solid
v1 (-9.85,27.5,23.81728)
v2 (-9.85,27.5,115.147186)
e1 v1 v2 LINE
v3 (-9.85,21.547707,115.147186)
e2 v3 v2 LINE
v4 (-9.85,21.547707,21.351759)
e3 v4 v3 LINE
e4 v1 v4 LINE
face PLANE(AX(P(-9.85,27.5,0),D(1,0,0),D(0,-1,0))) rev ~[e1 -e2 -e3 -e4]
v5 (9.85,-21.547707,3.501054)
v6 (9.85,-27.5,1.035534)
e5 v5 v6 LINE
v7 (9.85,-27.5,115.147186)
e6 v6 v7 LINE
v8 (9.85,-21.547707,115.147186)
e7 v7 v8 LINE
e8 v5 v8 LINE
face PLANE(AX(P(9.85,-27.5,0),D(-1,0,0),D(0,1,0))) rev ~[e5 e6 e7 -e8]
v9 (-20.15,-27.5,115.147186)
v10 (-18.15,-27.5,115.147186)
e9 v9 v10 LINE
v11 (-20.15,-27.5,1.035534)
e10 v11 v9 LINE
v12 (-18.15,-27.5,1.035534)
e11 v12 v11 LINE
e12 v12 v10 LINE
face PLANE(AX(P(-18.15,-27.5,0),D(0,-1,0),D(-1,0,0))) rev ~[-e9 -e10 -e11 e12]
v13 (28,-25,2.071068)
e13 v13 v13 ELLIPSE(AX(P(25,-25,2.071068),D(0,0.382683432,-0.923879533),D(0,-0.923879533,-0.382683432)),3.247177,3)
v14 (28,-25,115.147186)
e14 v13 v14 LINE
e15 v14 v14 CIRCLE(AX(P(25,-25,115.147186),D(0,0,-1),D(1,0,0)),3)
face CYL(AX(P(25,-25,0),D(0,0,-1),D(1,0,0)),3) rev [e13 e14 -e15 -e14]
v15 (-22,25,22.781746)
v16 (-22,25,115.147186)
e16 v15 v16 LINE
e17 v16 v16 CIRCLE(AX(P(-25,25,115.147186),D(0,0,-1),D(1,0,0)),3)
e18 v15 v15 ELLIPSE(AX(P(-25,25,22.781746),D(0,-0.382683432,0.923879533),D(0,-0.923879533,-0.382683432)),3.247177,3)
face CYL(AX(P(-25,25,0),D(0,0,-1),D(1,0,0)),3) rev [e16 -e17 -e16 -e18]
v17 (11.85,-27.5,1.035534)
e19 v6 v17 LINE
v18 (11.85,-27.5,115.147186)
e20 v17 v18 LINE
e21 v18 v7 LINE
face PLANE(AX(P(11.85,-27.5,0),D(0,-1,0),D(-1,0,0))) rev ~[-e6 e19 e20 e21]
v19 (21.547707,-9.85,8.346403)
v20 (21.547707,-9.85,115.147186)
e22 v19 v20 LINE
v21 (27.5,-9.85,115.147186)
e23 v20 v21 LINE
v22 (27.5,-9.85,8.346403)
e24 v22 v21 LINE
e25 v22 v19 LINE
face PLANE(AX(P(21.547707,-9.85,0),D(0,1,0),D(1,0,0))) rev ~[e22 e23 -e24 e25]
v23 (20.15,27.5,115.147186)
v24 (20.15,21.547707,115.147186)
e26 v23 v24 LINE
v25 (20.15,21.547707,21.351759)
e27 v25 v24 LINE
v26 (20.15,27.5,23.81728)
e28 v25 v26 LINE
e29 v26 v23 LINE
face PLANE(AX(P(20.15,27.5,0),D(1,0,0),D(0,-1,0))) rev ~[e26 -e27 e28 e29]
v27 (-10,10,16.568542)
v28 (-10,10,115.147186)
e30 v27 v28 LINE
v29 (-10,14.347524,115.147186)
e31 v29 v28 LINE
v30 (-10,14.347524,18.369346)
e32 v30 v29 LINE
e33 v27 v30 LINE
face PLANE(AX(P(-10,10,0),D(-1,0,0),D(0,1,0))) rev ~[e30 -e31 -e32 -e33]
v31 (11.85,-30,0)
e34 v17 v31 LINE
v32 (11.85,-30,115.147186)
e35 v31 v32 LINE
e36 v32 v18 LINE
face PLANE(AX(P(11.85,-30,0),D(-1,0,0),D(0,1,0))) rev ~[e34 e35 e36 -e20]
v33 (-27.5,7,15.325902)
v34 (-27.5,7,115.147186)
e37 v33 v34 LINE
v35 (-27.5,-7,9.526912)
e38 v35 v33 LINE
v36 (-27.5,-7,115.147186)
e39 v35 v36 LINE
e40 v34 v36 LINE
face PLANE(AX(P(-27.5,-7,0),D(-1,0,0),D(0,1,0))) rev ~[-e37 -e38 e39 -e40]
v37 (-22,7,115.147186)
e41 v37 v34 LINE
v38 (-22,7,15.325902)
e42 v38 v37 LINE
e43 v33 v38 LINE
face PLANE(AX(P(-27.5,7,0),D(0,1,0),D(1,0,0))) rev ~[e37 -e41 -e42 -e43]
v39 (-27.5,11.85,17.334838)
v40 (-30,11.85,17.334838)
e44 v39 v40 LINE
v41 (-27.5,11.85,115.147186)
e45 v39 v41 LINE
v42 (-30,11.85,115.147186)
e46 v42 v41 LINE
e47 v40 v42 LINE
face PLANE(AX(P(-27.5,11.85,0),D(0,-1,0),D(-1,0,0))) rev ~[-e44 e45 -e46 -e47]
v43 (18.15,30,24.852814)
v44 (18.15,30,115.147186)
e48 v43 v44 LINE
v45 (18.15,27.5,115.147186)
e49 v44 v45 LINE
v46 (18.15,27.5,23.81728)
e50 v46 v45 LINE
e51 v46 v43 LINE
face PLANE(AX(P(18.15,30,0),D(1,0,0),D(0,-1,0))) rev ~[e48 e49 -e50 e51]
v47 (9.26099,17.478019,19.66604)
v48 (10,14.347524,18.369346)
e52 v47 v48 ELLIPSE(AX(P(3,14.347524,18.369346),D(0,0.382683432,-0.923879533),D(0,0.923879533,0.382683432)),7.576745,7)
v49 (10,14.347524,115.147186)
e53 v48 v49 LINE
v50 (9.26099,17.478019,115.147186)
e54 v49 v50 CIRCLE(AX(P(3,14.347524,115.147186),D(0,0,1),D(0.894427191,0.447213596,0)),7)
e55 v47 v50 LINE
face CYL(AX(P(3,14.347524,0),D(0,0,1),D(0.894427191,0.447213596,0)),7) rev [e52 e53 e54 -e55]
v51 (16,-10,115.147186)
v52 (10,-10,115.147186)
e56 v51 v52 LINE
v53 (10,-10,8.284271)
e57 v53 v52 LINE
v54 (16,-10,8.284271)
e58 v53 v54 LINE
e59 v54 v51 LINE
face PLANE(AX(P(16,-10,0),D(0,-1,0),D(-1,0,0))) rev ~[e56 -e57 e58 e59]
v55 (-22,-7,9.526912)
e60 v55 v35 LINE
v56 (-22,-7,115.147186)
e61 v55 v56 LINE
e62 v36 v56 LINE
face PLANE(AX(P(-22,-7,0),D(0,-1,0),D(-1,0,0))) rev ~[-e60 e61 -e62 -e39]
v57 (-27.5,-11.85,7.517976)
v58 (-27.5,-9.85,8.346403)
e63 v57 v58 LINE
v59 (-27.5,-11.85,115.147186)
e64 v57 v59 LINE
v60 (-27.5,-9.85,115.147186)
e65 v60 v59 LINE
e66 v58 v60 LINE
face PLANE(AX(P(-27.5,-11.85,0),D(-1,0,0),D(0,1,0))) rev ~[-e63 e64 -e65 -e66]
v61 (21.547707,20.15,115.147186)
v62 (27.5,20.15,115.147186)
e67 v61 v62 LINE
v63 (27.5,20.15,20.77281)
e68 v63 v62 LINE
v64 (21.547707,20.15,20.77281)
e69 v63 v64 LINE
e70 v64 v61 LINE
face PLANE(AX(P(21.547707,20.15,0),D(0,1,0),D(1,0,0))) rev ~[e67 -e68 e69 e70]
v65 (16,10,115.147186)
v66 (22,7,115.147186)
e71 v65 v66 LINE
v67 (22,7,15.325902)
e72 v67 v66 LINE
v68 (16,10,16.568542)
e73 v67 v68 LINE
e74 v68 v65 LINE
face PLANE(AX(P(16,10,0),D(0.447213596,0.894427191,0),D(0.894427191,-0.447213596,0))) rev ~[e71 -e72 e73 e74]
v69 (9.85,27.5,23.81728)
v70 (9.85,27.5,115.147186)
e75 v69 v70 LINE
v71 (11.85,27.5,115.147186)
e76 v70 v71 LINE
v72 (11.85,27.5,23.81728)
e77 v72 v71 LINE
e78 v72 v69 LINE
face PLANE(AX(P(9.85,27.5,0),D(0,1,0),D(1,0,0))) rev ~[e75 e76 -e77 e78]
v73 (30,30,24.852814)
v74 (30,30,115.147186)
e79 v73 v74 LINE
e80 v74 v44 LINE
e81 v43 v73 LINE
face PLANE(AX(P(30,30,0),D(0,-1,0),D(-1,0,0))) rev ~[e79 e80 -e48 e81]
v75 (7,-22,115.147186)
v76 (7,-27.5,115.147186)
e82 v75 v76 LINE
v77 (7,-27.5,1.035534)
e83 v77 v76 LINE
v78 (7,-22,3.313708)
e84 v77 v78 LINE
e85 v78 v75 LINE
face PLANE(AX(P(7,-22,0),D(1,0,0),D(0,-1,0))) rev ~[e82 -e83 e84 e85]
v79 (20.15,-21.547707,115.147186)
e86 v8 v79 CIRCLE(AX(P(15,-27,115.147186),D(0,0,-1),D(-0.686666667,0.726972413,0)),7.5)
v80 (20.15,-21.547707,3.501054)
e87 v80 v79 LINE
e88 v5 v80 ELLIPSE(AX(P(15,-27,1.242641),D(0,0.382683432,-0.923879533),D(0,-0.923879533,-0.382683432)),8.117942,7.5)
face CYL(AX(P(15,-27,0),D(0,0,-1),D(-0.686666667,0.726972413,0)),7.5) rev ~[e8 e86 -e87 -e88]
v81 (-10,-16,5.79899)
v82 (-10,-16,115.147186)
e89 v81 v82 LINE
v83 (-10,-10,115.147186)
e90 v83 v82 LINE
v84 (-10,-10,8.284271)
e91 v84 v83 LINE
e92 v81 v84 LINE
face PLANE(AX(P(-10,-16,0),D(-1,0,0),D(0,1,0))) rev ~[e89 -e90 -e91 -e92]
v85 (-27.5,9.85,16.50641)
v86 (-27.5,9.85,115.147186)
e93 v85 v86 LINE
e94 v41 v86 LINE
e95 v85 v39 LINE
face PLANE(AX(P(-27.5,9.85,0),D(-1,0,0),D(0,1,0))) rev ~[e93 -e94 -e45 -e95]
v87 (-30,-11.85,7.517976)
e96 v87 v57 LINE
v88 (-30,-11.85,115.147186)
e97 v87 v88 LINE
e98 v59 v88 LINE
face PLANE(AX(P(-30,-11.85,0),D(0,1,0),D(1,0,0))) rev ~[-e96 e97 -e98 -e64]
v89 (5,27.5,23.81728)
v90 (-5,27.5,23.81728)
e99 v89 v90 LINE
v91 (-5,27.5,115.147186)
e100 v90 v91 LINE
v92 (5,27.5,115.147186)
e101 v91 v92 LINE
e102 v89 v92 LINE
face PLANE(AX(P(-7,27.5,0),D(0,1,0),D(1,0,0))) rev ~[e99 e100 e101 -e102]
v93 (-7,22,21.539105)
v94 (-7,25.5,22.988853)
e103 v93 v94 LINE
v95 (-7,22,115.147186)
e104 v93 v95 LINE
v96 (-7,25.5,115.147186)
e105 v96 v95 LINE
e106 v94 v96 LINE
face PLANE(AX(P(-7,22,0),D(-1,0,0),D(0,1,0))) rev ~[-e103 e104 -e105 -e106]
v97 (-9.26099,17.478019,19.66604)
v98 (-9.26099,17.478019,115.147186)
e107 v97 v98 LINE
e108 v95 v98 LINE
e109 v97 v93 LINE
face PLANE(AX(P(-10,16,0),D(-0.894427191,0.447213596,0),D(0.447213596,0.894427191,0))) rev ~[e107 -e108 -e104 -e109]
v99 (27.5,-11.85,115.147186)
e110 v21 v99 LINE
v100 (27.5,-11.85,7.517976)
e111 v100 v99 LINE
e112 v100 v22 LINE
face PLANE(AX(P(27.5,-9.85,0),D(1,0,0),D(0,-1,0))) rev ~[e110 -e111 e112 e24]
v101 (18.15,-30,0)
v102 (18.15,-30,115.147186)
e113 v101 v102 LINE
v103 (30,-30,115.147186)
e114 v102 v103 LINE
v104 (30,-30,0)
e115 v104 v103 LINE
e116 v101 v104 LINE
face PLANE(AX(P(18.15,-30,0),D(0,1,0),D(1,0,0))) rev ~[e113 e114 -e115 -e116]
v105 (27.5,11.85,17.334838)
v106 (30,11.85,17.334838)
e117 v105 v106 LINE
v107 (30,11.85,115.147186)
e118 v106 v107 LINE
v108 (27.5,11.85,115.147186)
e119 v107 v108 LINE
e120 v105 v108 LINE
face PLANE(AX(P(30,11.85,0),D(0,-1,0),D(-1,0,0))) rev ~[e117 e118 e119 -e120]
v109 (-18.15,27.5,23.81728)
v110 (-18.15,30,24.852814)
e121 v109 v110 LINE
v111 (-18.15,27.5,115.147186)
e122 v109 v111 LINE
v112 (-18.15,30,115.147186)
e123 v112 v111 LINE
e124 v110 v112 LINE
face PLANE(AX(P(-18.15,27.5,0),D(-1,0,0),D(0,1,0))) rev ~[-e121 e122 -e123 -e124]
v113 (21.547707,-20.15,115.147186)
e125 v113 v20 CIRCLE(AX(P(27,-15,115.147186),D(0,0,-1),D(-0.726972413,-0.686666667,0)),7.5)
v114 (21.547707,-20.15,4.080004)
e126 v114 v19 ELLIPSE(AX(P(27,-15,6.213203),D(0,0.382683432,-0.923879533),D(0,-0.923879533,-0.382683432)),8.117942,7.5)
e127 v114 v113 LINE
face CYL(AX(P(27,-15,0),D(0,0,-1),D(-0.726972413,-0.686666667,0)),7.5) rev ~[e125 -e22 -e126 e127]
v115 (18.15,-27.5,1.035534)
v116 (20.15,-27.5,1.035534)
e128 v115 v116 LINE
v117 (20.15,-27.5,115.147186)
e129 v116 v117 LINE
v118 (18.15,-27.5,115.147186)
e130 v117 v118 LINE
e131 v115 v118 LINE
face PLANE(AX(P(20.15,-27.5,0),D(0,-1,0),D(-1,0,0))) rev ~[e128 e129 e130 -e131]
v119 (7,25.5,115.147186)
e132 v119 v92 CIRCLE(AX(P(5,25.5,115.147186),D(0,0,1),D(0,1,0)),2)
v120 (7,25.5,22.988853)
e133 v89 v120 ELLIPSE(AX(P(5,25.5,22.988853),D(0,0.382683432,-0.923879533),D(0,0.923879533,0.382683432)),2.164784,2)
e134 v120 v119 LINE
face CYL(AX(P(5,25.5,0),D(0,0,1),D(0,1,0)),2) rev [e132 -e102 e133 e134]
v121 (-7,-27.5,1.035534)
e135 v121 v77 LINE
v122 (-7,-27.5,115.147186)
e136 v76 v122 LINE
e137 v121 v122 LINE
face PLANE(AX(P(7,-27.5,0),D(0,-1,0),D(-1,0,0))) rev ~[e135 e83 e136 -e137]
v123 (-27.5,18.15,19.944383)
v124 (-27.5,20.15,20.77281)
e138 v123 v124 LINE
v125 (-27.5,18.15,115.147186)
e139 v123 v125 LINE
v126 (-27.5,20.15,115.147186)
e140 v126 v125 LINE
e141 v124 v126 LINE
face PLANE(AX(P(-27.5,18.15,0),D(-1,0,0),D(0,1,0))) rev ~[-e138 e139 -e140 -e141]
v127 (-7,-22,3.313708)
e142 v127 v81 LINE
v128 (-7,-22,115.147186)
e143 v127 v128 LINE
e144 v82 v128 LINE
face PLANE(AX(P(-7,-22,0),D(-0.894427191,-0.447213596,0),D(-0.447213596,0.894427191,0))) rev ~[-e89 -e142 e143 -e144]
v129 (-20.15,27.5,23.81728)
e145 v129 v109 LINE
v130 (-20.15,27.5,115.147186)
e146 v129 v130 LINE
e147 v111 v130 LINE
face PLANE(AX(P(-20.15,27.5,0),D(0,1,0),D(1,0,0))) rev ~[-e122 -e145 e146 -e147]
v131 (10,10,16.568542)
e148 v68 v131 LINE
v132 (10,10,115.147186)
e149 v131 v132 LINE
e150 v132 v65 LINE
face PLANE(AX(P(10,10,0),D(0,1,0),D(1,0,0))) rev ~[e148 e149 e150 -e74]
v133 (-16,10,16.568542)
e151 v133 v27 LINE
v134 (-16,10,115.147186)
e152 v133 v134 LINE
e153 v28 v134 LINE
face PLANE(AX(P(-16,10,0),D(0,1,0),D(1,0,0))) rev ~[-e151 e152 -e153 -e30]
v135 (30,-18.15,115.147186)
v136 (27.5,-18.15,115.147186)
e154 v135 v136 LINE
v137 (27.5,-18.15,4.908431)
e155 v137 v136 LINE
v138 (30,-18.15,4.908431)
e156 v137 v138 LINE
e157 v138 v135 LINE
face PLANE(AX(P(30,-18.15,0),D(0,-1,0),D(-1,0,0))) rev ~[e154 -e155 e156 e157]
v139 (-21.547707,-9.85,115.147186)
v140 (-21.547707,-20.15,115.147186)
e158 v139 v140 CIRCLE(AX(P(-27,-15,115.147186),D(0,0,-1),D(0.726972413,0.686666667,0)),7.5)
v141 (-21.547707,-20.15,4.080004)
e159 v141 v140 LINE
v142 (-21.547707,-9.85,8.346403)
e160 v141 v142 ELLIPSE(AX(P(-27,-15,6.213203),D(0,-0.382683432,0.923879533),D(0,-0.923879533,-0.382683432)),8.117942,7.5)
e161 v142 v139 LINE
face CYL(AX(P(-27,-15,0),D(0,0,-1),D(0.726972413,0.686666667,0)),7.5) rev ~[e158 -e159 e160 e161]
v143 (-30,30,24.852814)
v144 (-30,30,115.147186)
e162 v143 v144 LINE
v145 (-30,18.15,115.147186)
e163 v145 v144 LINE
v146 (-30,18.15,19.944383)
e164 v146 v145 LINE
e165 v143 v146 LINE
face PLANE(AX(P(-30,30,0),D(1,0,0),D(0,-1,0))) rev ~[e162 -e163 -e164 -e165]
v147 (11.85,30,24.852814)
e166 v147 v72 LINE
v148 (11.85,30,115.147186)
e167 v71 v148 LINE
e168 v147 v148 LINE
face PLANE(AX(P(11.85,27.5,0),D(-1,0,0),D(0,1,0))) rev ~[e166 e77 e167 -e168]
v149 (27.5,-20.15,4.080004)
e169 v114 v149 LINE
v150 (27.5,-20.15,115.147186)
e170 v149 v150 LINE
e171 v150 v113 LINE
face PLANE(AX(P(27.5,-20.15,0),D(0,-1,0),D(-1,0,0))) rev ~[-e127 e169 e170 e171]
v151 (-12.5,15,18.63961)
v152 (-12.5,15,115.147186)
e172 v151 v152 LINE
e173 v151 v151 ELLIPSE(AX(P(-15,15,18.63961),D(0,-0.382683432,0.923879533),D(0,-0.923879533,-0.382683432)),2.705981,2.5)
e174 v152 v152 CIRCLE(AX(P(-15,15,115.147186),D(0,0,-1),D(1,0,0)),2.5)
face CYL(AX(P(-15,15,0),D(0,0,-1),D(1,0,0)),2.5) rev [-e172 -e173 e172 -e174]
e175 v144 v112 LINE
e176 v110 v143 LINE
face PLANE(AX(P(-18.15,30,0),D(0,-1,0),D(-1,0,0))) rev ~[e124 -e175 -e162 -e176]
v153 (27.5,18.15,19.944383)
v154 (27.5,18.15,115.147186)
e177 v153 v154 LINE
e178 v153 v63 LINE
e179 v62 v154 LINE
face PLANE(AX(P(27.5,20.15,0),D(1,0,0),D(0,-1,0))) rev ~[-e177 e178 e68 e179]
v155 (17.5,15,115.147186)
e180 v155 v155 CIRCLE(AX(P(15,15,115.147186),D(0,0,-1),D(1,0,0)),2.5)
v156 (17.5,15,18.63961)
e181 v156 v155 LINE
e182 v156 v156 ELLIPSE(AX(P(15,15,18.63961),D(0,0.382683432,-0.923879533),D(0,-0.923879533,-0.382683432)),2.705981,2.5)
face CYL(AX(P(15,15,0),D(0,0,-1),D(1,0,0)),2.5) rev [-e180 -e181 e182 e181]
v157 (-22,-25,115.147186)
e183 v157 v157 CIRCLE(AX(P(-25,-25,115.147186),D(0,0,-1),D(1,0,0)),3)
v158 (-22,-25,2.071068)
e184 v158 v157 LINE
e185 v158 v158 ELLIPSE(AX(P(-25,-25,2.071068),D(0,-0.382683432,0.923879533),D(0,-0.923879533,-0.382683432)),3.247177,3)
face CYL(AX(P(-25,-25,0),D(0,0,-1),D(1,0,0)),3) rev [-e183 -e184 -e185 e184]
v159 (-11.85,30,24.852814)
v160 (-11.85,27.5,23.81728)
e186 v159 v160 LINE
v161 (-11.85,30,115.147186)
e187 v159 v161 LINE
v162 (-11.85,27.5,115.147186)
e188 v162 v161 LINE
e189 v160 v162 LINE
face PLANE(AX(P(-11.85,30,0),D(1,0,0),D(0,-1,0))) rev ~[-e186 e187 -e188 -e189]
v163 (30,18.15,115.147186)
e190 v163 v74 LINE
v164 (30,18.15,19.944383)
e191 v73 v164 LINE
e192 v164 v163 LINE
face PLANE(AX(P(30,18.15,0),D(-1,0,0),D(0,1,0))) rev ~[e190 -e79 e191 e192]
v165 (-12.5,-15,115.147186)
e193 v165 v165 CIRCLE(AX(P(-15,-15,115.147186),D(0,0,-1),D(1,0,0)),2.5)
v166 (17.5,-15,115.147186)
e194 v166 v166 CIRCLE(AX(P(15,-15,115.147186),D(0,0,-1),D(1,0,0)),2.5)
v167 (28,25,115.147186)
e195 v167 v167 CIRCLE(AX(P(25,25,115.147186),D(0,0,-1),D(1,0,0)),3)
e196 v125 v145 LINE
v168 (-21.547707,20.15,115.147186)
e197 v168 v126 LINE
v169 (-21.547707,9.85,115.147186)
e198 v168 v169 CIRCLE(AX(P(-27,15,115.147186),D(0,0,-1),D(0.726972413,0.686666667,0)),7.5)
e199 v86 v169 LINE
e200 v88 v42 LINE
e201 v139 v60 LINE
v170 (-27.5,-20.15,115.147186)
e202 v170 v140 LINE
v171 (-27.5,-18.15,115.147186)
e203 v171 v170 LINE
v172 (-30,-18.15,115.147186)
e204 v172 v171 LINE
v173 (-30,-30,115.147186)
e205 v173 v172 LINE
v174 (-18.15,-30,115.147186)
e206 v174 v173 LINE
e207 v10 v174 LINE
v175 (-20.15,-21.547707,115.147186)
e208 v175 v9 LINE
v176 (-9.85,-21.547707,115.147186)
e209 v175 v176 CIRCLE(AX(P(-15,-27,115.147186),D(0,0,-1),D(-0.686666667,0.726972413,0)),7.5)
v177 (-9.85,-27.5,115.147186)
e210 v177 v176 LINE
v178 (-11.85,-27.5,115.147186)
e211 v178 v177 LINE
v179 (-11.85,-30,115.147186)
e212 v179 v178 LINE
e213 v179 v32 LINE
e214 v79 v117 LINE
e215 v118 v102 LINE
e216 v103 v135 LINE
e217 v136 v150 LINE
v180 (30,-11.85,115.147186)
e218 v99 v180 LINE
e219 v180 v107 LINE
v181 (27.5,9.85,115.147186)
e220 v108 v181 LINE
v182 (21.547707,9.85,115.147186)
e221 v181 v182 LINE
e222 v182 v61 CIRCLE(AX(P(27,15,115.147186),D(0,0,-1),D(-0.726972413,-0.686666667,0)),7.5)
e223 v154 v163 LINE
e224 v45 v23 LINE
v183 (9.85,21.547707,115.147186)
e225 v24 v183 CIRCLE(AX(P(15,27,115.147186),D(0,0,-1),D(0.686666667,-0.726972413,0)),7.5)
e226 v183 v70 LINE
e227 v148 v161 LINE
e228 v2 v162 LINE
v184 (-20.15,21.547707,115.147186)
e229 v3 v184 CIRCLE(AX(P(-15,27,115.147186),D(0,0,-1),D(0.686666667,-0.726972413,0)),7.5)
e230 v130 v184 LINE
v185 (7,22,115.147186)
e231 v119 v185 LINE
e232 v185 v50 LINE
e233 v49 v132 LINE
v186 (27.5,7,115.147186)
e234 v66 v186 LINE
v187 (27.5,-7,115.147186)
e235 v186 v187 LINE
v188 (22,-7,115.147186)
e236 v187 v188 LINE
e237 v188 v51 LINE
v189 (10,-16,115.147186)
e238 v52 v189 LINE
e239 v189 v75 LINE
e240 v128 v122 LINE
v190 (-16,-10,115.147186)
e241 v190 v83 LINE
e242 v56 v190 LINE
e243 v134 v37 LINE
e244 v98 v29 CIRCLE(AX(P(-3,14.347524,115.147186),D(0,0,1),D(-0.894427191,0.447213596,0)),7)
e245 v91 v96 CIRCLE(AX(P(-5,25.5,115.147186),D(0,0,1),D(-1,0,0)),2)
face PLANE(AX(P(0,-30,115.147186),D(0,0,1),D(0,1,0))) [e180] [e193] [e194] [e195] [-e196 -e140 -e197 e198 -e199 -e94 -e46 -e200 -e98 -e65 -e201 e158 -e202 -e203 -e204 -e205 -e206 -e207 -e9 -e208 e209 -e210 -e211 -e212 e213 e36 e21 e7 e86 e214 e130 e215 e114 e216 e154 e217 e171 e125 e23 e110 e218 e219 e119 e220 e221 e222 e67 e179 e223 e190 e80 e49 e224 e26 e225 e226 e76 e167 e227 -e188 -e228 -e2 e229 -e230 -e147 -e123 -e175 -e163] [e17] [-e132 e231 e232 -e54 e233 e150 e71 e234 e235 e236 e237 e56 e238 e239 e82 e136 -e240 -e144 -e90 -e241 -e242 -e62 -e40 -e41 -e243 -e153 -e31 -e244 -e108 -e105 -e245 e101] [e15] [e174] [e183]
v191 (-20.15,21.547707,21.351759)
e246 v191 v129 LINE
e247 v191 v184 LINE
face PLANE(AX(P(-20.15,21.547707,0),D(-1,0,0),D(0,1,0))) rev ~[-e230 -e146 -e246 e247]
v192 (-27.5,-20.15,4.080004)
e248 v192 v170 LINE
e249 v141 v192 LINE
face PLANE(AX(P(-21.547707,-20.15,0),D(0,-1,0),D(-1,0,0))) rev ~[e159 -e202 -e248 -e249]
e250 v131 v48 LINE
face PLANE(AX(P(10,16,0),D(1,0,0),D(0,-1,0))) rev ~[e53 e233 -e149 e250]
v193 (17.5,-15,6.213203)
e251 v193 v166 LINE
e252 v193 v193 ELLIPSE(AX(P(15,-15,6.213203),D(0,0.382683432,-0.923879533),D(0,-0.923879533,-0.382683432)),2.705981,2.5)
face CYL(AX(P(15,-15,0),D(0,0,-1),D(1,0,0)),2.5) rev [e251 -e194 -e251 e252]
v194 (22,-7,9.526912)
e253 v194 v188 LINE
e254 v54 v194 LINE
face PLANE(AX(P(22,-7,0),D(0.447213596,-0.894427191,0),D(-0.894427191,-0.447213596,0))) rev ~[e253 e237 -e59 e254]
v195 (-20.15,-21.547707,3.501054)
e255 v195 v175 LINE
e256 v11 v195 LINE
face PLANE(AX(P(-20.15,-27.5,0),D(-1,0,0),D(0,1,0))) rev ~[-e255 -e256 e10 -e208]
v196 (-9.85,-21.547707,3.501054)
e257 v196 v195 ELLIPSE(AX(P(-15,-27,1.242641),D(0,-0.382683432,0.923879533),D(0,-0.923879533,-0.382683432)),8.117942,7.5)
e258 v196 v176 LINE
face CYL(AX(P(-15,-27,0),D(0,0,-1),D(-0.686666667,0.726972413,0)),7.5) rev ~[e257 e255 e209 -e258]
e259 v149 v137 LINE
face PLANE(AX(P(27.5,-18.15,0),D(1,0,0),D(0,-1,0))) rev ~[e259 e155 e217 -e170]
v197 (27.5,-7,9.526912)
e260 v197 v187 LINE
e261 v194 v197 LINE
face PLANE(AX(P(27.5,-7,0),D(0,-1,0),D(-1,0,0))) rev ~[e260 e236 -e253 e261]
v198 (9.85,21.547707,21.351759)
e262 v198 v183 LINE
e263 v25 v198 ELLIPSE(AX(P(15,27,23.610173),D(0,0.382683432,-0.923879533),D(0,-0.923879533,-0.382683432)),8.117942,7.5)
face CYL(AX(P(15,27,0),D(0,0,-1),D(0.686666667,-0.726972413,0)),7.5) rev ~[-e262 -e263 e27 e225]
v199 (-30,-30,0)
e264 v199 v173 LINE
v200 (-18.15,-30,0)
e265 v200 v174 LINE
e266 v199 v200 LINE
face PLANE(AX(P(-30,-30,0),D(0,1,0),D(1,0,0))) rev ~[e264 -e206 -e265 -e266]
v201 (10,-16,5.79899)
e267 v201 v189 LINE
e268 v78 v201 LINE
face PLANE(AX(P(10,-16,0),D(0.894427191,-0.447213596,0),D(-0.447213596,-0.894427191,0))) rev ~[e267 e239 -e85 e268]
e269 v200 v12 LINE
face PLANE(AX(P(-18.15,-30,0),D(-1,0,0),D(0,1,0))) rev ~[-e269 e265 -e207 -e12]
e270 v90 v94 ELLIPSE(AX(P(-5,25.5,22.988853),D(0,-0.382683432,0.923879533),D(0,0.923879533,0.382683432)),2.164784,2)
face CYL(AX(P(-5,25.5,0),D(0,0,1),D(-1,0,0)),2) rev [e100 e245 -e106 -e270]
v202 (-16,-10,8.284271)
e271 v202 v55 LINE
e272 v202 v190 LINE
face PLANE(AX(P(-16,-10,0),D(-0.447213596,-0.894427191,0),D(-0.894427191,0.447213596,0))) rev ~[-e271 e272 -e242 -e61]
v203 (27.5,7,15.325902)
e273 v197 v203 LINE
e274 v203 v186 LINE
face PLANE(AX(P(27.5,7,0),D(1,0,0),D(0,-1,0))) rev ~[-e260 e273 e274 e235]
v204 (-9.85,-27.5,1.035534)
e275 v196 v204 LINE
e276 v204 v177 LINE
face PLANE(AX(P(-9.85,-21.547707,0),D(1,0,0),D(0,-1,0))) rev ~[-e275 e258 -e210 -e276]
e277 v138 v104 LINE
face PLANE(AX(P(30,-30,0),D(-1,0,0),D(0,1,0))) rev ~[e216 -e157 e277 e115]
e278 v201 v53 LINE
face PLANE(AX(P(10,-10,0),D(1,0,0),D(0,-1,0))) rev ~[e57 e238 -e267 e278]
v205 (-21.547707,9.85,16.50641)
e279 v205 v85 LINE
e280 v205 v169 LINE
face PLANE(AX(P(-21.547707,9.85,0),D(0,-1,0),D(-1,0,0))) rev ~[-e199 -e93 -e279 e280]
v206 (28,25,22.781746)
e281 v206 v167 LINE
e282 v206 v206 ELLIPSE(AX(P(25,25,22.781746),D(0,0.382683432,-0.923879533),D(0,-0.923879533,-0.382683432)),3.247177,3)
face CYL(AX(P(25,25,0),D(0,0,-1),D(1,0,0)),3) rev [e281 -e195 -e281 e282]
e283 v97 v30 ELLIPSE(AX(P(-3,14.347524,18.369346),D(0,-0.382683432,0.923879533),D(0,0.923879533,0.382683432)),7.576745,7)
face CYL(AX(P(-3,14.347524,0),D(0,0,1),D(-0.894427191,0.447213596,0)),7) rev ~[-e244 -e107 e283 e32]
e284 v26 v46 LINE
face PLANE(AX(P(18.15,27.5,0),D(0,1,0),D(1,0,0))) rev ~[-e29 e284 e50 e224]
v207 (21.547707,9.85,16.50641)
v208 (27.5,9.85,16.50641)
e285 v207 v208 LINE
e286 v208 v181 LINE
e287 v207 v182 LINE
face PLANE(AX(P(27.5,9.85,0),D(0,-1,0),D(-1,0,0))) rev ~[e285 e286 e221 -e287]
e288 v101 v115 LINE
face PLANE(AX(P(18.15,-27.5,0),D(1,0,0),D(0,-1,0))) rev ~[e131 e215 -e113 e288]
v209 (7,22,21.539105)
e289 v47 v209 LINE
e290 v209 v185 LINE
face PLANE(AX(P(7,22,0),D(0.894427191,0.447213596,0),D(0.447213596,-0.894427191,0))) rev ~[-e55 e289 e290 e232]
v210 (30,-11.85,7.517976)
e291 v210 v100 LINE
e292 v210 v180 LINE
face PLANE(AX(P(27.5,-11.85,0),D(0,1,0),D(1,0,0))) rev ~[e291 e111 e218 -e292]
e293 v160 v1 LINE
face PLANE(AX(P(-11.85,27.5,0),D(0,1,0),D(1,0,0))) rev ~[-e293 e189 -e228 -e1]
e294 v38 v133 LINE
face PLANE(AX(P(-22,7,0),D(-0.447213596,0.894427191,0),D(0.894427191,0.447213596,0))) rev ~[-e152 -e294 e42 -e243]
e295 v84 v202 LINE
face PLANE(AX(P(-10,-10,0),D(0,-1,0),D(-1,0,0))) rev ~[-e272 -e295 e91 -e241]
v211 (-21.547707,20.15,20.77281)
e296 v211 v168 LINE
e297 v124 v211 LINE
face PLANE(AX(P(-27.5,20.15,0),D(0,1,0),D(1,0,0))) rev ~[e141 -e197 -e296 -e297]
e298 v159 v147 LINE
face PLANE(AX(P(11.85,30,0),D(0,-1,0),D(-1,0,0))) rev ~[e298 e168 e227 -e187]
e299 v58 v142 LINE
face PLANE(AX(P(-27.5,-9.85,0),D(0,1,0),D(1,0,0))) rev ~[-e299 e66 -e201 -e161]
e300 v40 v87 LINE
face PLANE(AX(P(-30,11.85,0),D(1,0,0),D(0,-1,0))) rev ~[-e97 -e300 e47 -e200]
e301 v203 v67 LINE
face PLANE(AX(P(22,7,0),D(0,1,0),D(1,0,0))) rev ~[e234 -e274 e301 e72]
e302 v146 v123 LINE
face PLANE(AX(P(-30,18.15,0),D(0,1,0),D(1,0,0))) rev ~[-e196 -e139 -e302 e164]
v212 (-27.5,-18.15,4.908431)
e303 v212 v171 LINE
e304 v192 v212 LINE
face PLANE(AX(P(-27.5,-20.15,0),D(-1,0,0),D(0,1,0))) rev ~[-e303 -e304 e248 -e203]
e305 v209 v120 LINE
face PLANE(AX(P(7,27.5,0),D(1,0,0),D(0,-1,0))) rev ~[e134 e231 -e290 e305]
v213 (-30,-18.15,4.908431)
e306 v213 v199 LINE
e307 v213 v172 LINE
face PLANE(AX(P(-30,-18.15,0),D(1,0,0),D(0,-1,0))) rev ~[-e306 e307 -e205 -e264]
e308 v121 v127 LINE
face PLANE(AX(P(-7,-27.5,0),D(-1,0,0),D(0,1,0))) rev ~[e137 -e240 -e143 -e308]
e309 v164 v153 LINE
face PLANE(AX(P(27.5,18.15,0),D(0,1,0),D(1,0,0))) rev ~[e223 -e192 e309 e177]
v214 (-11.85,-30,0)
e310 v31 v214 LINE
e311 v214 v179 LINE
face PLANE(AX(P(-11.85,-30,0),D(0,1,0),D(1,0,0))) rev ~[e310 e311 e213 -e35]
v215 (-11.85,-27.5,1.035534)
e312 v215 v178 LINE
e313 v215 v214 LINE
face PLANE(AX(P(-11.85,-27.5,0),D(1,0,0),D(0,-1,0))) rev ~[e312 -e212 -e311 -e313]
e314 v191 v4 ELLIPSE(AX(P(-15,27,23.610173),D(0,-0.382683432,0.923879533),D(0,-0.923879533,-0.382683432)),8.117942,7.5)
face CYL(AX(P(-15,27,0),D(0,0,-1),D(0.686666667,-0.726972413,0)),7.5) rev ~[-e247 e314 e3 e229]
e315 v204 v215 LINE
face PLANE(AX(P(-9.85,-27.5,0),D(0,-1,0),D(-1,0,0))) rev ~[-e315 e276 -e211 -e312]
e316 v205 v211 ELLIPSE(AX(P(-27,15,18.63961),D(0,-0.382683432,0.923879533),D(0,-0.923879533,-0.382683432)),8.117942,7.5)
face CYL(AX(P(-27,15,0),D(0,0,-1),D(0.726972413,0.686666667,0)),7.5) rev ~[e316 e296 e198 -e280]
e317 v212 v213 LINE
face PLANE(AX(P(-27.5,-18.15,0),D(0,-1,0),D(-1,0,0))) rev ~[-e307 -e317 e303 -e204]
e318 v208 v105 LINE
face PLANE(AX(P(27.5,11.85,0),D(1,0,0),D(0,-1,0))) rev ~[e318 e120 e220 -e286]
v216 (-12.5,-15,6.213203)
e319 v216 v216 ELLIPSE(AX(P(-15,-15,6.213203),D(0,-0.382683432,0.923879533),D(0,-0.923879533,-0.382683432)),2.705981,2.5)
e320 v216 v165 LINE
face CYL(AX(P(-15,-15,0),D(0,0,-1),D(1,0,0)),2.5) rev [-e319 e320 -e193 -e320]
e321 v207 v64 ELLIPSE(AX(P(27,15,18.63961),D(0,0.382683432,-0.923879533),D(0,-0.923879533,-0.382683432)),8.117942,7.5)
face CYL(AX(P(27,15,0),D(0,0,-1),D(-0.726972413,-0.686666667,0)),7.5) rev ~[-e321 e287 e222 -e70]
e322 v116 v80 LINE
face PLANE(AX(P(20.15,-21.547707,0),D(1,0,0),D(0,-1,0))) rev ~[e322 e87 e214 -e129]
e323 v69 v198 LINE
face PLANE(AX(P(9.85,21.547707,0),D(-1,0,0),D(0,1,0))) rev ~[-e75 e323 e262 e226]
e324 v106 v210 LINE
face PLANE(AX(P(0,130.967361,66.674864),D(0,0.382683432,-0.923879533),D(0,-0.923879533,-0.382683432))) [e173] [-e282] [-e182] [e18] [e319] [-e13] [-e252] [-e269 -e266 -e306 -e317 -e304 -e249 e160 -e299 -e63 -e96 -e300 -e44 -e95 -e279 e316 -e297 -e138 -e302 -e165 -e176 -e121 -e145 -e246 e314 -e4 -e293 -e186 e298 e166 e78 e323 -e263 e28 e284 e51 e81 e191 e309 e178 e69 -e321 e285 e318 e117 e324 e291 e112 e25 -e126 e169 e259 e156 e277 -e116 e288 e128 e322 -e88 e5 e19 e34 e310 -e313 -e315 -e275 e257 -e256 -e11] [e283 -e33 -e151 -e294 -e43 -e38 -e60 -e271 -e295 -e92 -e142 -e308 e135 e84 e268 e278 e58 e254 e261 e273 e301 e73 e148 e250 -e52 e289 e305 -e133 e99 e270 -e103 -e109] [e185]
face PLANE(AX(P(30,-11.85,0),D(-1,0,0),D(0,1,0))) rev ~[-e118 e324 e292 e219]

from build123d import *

# Parameters (mm, degrees)
F0_R          = 3
F0_R_2        = 2.5
F1_DEPTH      = 140
F2_R          = 2
F3_R          = 7
F6_DEPTH      = 30
F6_DEPTH_BACK = 30
F7_W          = 131.1645284295
F7_H          = 50.7057756186
F8_DEPTH      = 30
F8_DEPTH_BACK = 30


# Not quite as in the source:
# - a feature names something its author has since deleted; it is built from what else it names


with BuildPart() as f1:
    # F0 (on Top) → F1 (new body)
    with BuildSketch(Plane.XY):
        with BuildLine():
            Line((18.15, -30), (30, -30))
            Line((30, -30), (30, -18.15))
            Line((30, -18.15), (27.5, -18.15))
            Line((27.5, -18.15), (27.5, -20.15))
            Line((27.5, -20.15), (21.5477069044, -20.15))
            ThreePointArc((21.5477069044, -20.15), (19.5, -15), (21.5477069044, -9.85))
            Line((21.5477069044, -9.85), (27.5, -9.85))
            Line((27.5, -9.85), (27.5, -11.85))
            Line((27.5, -11.85), (30, -11.85))
            Line((30, -11.85), (30, 11.85))
            Line((30, 11.85), (27.5, 11.85))
            Line((27.5, 11.85), (27.5, 9.85))
            Line((27.5, 9.85), (21.5477069044, 9.85))
            ThreePointArc((21.5477069044, 9.85), (19.5, 15), (21.5477069044, 20.15))
            Line((21.5477069044, 20.15), (27.5, 20.15))
            Line((27.5, 20.15), (27.5, 18.15))
            Line((27.5, 18.15), (30, 18.15))
            Line((30, 18.15), (30, 30))
            Line((30, 30), (18.15, 30))
            Line((18.15, 30), (18.15, 27.5))
            Line((18.15, 27.5), (20.15, 27.5))
            Line((20.15, 27.5), (20.15, 21.5477069044))
            ThreePointArc((20.15, 21.5477069044), (15, 19.5), (9.85, 21.5477069044))
            Line((9.85, 21.5477069044), (9.85, 27.5))
            Line((9.85, 27.5), (11.85, 27.5))
            Line((11.85, 27.5), (11.85, 30))
            Line((11.85, 30), (-11.85, 30))
            Line((-11.85, 30), (-11.85, 27.5))
            Line((-11.85, 27.5), (-9.85, 27.5))
            Line((-9.85, 27.5), (-9.85, 21.5477069044))
            ThreePointArc((-9.85, 21.5477069044), (-15, 19.5), (-20.15, 21.5477069044))
            Line((-20.15, 21.5477069044), (-20.15, 27.5))
            Line((-20.15, 27.5), (-18.15, 27.5))
            Line((-18.15, 27.5), (-18.15, 30))
            Line((-18.15, 30), (-30, 30))
            Line((-30, 30), (-30, 18.15))
            Line((-30, 18.15), (-27.5, 18.15))
            Line((-27.5, 18.15), (-27.5, 20.15))
            Line((-27.5, 20.15), (-21.5477069044, 20.15))
            ThreePointArc((-21.5477069044, 20.15), (-19.5, 15), (-21.5477069044, 9.85))
            Line((-21.5477069044, 9.85), (-27.5, 9.85))
            Line((-27.5, 9.85), (-27.5, 11.85))
            Line((-27.5, 11.85), (-30, 11.85))
            Line((-30, 11.85), (-30, -11.85))
            Line((-30, -11.85), (-27.5, -11.85))
            Line((-27.5, -11.85), (-27.5, -9.85))
            Line((-27.5, -9.85), (-21.5477069044, -9.85))
            ThreePointArc((-21.5477069044, -9.85), (-19.5, -15), (-21.5477069044, -20.15))
            Line((-21.5477069044, -20.15), (-27.5, -20.15))
            Line((-27.5, -20.15), (-27.5, -18.15))
            Line((-27.5, -18.15), (-30, -18.15))
            Line((-30, -18.15), (-30, -30))
            Line((-30, -30), (-18.15, -30))
            Line((-18.15, -30), (-18.15, -27.5))
            Line((-18.15, -27.5), (-20.15, -27.5))
            Line((-20.15, -27.5), (-20.15, -21.5477069044))
            ThreePointArc((-20.15, -21.5477069044), (-15, -19.5), (-9.85, -21.5477069044))
            Line((-9.85, -21.5477069044), (-9.85, -27.5))
            Line((-9.85, -27.5), (-11.85, -27.5))
            Line((-11.85, -27.5), (-11.85, -30))
            Line((-11.85, -30), (11.85, -30))
            Line((11.85, -30), (11.85, -27.5))
            Line((11.85, -27.5), (9.85, -27.5))
            Line((9.85, -27.5), (9.85, -21.5477069044))
            ThreePointArc((9.85, -21.5477069044), (15, -19.5), (20.15, -21.5477069044))
            Line((20.15, -21.5477069044), (20.15, -27.5))
            Line((20.15, -27.5), (18.15, -27.5))
            Line((18.15, -27.5), (18.15, -30))
        make_face()
        with Locations((-25, -25)):
            Circle(F0_R, mode=Mode.SUBTRACT)
        with Locations((-15, -15)):
            Circle(F0_R_2, mode=Mode.SUBTRACT)
        with Locations((25, -25)):
            Circle(F0_R, mode=Mode.SUBTRACT)
        with Locations((15, -15)):
            Circle(F0_R_2, mode=Mode.SUBTRACT)
        with Locations((-25, 25)):
            Circle(F0_R, mode=Mode.SUBTRACT)
        with Locations((-15, 15)):
            Circle(F0_R_2, mode=Mode.SUBTRACT)
        Polygon((-7, 22), (-7, 27.5), (0, 27.5), (7, 27.5), (7, 22), (10, 16), (10, 10), (16, 10), (22, 7), (27.5, 7), (27.5, 0), (27.5, -7), (22, -7), (16, -10), (10, -10), (10, -16), (7, -22), (7, -27.5), (0, -27.5), (-7, -27.5), (-7, -22), (-10, -16), (-10, -10), (-16, -10), (-22, -7), (-27.5, -7), (-27.5, 0), (-27.5, 7), (-22, 7), (-16, 10), (-10, 10), (-10, 16), align=None, mode=Mode.SUBTRACT)
        with Locations((15, 15)):
            Circle(F0_R_2, mode=Mode.SUBTRACT)
        with Locations((25, 25)):
            Circle(F0_R, mode=Mode.SUBTRACT)
    extrude(amount=F1_DEPTH)

    # F2
    f2_edges = [f1.edges().sort_by_distance(p)[0] for p in [
        (-7, 27.5, 70),
        (7, 27.5, 70),
    ]]
    fillet(f2_edges, radius=F2_R)

    # F3
    f3_edges = [f1.edges().sort_by_distance(p)[0] for p in [
        (-10, 16, 70),
        (10, 16, 70),
    ]]
    fillet(f3_edges, radius=F3_R)

    # F5 (on Right) → F6 (cut, two sides)
    with BuildSketch(Plane.YZ) as f6_sk:
        Polygon((214.5999793503, -135.2321386172), (130.9673605882, 66.674863855), (-30, 0), (53.6326187621, -201.9070024722), align=None)
        Polygon((30, 140), (-2.0081647111, 217.2745453523), (-162.3392477394, 150.863236292), (-130.3310830283, 73.5886909397), align=None)
    extrude(amount=-F6_DEPTH, mode=Mode.SUBTRACT)
    extrude(f6_sk.sketch, amount=F6_DEPTH_BACK, mode=Mode.SUBTRACT)

    # F7 (on Right) → F8 (cut, two sides)
    with BuildSketch(Plane.YZ) as f8_sk:
        with Locations((35.5822642148, 140.5000740669)):
            Rectangle(F7_W, F7_H)
    extrude(amount=F8_DEPTH, mode=Mode.SUBTRACT)
    extrude(f8_sk.sketch, amount=-F8_DEPTH_BACK, mode=Mode.SUBTRACT)


solid = f1.part
